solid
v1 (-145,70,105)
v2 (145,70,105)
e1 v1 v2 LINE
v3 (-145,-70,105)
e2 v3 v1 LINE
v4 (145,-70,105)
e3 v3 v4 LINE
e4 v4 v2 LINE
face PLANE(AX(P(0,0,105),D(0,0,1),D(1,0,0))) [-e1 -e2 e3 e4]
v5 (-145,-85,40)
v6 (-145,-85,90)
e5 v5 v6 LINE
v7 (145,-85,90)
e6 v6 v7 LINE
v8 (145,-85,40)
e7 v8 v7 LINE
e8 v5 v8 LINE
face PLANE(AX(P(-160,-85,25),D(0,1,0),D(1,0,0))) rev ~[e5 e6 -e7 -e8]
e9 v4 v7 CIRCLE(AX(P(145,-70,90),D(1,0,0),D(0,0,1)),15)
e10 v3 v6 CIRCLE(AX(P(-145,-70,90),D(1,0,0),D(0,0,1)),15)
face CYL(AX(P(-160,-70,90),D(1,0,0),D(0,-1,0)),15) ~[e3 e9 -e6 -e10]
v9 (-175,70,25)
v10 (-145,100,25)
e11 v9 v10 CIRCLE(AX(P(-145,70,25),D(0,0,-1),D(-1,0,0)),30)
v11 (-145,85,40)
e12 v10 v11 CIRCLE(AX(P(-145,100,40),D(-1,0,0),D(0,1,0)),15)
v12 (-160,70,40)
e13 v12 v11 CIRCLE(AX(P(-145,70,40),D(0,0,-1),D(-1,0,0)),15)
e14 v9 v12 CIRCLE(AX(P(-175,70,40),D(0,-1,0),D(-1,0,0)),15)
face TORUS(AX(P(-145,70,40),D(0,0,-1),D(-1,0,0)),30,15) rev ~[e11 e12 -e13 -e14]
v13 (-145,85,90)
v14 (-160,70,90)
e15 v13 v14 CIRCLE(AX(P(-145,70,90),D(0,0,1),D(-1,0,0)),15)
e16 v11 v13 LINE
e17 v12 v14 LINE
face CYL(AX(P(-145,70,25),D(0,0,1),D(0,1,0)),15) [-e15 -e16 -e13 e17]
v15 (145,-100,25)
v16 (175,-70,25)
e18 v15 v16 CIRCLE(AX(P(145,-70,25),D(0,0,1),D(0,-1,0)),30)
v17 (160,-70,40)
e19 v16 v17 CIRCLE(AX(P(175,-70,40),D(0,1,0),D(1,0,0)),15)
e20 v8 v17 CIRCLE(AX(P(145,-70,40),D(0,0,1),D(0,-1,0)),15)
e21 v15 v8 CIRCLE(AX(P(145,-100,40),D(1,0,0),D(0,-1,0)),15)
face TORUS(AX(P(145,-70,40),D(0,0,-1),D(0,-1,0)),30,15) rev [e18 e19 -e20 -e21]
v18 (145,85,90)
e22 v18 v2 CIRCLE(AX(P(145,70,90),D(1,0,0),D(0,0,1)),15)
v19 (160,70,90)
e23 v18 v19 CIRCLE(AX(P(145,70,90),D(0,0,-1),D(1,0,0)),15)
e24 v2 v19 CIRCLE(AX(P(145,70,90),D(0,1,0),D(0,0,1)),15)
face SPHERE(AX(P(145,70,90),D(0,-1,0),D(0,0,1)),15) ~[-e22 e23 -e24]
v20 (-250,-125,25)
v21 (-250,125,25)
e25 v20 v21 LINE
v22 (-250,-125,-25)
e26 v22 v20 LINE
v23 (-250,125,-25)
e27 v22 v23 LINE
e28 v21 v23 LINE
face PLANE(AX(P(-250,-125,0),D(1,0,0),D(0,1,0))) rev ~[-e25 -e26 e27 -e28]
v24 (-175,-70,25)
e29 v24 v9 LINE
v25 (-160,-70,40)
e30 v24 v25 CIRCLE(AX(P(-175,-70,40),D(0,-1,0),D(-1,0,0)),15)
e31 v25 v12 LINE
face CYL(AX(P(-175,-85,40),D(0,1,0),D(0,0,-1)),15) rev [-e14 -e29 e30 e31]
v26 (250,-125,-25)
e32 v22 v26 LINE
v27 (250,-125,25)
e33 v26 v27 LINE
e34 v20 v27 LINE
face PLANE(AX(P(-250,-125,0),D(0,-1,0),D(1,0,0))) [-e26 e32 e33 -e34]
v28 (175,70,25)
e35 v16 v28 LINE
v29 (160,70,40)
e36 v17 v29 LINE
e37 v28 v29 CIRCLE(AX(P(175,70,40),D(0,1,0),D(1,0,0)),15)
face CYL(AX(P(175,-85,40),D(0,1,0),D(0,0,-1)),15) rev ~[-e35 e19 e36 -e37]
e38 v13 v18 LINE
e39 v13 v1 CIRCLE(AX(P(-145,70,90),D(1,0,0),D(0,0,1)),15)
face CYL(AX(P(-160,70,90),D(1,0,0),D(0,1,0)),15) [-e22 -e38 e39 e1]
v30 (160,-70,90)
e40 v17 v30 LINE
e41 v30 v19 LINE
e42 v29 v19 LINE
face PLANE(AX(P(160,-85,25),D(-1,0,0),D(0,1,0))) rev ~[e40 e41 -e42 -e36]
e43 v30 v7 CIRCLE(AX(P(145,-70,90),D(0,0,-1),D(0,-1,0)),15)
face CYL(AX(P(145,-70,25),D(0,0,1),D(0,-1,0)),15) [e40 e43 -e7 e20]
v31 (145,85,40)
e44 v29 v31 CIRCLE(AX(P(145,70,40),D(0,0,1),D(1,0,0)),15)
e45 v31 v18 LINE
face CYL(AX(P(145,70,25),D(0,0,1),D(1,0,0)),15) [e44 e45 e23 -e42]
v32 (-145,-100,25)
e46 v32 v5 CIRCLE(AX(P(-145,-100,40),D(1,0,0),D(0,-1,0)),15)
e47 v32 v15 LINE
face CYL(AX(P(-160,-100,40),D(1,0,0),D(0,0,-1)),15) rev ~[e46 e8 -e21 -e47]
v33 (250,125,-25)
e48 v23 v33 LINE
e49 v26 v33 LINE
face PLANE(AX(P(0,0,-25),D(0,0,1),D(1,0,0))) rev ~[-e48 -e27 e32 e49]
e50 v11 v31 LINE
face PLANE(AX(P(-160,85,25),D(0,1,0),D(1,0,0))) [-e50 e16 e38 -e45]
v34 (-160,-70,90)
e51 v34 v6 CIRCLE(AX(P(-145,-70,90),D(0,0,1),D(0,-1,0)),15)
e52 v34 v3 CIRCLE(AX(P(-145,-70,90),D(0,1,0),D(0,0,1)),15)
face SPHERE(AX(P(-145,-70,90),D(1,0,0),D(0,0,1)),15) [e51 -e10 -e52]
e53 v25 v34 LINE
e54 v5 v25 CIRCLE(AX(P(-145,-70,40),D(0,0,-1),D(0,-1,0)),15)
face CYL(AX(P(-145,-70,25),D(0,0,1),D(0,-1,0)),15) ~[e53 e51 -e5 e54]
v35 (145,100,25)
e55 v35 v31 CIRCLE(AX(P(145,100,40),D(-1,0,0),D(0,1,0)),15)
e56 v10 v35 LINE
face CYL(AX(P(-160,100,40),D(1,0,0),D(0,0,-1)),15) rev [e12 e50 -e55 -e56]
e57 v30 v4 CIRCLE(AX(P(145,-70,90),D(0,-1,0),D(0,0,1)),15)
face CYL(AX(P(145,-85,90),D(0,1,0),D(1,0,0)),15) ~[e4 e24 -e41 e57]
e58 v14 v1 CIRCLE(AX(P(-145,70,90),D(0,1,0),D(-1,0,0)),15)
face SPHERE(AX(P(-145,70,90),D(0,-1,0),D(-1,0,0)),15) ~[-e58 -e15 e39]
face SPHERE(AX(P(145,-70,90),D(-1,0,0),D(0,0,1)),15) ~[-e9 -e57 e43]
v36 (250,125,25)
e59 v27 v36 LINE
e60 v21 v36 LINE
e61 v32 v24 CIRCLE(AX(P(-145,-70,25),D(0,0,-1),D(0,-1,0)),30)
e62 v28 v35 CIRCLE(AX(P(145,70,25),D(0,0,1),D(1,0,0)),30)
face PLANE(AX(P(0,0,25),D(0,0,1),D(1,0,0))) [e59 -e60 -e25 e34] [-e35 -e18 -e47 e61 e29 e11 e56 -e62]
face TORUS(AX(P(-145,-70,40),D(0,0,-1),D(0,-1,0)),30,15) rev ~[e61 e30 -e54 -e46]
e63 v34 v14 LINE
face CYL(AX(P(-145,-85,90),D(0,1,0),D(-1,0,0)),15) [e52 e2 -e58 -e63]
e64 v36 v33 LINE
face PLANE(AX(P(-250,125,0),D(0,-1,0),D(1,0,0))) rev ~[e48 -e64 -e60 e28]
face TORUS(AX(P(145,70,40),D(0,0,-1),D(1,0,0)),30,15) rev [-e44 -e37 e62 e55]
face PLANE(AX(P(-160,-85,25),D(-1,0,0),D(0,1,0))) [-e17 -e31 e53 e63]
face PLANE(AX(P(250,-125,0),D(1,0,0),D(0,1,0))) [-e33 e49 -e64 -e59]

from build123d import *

# Parameters (mm, degrees)
F0_W     = 500
F0_H     = 250
F1_DEPTH = 25
F2_W     = 320
F2_H     = 170
F3_DEPTH = 80
F4_R     = 15


with BuildPart() as f1:
    # F0 (on Top) → F1 (new body, symmetric)
    with BuildSketch(Plane.XY):
        Rectangle(F0_W, F0_H)
    extrude(amount=F1_DEPTH, both=True)

    # F2 (on face) → F3 (join)
    with BuildSketch(Plane.XY.offset(25)):
        Rectangle(F2_W, F2_H)
    extrude(amount=F3_DEPTH)

    # F4
    f4_edges = [f1.edges().sort_by_distance(p)[0] for p in [
        (0, -85, 105),
        (-160, 0, 105),
        (160, 0, 105),
        (-160, -85, 65),
        (-160, 85, 65),
        (160, -85, 65),
        (0, 85, 105),
        (160, 85, 65),
        (0, -85, 25),
        (-160, 0, 25),
        (160, 0, 25),
        (0, 85, 25),
    ]]
    fillet(f4_edges, radius=F4_R)


solid = f1.part
